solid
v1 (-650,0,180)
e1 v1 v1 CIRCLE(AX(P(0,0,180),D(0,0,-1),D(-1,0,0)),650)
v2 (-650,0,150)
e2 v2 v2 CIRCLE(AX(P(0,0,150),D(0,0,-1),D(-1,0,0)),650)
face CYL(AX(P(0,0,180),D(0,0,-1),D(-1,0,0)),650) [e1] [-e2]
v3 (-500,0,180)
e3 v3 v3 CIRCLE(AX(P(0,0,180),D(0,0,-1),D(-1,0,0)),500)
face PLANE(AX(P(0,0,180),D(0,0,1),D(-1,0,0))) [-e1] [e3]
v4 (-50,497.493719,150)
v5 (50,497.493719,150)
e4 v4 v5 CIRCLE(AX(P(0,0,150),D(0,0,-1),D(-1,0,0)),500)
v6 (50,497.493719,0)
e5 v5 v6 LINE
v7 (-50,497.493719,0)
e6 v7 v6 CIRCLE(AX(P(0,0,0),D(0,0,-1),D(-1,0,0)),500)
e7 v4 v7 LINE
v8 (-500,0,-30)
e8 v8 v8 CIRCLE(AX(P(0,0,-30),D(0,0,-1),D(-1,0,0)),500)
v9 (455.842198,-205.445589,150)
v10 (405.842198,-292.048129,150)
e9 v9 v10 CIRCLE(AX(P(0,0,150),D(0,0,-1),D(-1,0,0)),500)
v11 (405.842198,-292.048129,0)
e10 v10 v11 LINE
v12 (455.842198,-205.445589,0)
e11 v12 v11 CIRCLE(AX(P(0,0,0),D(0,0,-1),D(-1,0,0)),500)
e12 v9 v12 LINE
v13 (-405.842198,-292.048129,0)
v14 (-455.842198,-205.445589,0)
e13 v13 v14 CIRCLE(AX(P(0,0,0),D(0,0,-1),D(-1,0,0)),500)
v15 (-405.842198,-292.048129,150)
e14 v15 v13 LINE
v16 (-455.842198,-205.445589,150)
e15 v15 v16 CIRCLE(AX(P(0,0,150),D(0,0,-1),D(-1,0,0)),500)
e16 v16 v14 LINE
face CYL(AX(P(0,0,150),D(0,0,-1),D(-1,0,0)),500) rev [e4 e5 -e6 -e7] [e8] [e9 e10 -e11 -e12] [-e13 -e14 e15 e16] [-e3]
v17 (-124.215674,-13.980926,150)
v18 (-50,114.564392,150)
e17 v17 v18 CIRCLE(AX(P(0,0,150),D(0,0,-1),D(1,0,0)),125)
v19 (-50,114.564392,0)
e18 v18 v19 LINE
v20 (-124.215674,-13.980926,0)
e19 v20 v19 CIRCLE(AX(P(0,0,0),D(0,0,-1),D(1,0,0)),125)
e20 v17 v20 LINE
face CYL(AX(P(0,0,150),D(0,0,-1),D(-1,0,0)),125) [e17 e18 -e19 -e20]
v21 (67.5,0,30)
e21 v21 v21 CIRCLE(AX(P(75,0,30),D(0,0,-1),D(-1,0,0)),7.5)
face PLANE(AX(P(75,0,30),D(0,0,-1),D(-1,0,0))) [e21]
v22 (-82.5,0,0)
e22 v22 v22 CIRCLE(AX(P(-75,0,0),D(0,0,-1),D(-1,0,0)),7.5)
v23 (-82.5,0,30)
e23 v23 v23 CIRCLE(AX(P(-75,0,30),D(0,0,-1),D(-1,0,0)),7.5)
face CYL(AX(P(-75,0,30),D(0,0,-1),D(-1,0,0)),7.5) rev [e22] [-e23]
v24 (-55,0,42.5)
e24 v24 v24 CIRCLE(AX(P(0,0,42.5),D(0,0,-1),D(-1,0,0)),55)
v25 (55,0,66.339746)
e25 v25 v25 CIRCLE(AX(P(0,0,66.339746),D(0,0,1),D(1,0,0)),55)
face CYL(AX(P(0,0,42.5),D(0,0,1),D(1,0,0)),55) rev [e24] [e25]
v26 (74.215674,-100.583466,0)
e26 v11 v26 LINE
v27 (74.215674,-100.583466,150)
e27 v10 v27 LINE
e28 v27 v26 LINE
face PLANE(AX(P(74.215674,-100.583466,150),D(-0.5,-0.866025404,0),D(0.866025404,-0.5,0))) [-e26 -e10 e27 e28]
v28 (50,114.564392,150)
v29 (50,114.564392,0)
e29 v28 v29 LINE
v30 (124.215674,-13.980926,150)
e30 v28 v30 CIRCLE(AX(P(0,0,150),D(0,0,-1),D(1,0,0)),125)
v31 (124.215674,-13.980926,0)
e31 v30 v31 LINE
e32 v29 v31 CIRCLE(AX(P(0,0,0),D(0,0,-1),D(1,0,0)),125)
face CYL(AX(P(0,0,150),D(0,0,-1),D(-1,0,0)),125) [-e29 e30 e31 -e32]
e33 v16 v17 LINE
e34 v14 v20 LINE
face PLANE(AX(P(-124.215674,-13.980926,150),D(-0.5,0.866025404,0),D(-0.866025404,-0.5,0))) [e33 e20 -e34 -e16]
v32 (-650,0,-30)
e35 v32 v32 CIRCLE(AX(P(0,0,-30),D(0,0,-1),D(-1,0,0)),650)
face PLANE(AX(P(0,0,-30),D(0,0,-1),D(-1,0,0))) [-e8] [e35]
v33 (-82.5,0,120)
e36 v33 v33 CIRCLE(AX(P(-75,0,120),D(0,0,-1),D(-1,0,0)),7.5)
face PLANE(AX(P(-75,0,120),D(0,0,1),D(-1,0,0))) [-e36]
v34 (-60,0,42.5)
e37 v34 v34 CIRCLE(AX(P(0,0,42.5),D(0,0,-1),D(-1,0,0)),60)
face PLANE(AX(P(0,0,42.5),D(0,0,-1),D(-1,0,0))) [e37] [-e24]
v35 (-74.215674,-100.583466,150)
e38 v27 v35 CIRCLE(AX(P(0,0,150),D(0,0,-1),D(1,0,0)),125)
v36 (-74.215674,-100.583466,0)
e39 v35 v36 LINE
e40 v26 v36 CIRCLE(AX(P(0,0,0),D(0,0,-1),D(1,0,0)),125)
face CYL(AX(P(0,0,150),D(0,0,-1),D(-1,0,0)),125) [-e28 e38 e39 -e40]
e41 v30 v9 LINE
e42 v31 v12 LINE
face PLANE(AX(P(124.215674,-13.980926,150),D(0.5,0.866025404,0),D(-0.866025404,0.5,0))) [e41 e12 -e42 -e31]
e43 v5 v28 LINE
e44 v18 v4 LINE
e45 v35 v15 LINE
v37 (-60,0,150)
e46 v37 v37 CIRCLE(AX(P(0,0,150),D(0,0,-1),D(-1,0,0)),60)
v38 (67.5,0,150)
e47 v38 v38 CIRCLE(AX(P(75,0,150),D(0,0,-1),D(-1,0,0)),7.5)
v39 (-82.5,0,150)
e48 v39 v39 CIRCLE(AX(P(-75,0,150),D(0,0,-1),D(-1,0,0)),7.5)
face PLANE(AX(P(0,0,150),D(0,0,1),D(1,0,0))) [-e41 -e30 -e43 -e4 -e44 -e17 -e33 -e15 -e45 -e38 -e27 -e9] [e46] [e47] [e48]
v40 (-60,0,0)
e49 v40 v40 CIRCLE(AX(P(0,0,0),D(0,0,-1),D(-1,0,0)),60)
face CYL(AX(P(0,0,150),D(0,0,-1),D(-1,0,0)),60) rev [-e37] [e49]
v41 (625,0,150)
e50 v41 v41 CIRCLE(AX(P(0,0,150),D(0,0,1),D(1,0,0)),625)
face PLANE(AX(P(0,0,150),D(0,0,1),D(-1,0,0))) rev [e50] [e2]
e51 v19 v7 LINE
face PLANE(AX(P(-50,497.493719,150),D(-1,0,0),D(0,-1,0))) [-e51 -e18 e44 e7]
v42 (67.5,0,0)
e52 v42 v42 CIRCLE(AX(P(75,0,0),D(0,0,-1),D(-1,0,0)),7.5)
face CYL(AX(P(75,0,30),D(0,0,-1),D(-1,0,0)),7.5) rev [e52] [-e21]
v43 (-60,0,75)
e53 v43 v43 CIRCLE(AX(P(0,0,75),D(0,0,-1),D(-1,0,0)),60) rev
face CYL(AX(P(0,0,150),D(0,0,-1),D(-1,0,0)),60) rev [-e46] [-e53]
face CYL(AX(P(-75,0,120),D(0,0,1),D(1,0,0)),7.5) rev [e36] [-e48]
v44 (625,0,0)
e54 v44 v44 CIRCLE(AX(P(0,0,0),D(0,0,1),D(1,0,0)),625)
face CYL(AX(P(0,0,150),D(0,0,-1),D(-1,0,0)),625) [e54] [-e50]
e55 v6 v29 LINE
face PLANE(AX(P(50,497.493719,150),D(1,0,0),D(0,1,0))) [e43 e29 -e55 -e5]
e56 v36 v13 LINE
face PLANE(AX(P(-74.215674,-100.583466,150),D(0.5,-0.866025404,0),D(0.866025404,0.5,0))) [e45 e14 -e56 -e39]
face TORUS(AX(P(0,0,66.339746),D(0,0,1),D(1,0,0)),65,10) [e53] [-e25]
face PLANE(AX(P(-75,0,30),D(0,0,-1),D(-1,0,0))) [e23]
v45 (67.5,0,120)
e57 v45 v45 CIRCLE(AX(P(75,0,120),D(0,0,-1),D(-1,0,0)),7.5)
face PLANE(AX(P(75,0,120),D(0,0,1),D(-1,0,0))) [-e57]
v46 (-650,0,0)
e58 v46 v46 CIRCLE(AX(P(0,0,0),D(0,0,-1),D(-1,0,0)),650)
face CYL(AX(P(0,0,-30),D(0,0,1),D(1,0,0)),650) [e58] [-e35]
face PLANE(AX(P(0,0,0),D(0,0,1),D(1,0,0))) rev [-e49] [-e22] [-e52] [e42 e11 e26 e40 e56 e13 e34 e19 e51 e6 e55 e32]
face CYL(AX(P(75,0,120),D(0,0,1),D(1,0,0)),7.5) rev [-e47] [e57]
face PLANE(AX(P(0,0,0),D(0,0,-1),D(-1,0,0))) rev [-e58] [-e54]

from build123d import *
from build123d.topology import SkipClean

# Parameters (mm, degrees)
SKETCH3_R           = 625
BOSS_EXTRUDE1_DEPTH = 150
SKETCH4_R           = 60
CUT_EXTRUDE1_DEPTH  = 897.521054
BOSS_EXTRUDE2_START = 32.5
SKETCH5_R           = 60
SKETCH5_R_2         = 55
BOSS_EXTRUDE2_DEPTH = 32.5
FILLET3_R           = 10
SKETCH6_R           = 7.5
CUT_EXTRUDE2_DEPTH  = 30
BOSS_EXTRUDE3_START = 30
SKETCH7_R           = 650
SKETCH7_R_2         = 500
BOSS_EXTRUDE3_DEPTH = 30


with BuildPart() as part:
    # Sketch3 → Boss-Extrude1 (new body)
    with BuildSketch(Plane.XY):
        Circle(SKETCH3_R)
        with BuildLine():
            Line((-50, 497.493719), (-50, 114.564392))
            ThreePointArc((-50, 114.564392), (-108.253175, 62.5), (-124.215674, -13.980926))
            Line((-124.215674, -13.980926), (-455.842198, -205.445589))
            ThreePointArc((-455.842198, -205.445589), (-433.012702, 250), (-50, 497.493719))
        make_face(mode=Mode.SUBTRACT)
        with BuildLine():
            Line((50, 497.493719), (50, 114.564392))
            ThreePointArc((50, 114.564392), (108.253175, 62.5), (124.215674, -13.980926))
            Line((124.215674, -13.980926), (455.842198, -205.445589))
            ThreePointArc((455.842198, -205.445589), (433.012702, 250), (50, 497.493719))
        make_face(mode=Mode.SUBTRACT)
        with BuildLine():
            Line((-74.215674, -100.583466), (-405.842198, -292.048129))
            ThreePointArc((-405.842198, -292.048129), (0, -500), (405.842198, -292.048129))
            Line((405.842198, -292.048129), (74.215674, -100.583466))
            ThreePointArc((74.215674, -100.583466), (0, -125), (-74.215674, -100.583466))
        make_face(mode=Mode.SUBTRACT)
    extrude(amount=BOSS_EXTRUDE1_DEPTH)

    # Sketch4 → Cut-Extrude1 (cut, through all)
    with BuildSketch(Plane(origin=(0, 0, 0), x_dir=(-1, 0, 0), z_dir=(0, 0, -1))):
        Circle(SKETCH4_R)
    extrude(amount=-CUT_EXTRUDE1_DEPTH, mode=Mode.SUBTRACT)

    # Sketch5 → Boss-Extrude2 (add)
    with BuildSketch(Plane(origin=(0, 0, 75), x_dir=(-1, 0, 0), z_dir=(0, 0, -1)).offset(BOSS_EXTRUDE2_START)):
        Circle(SKETCH5_R)
        Circle(SKETCH5_R_2, mode=Mode.SUBTRACT)
    extrude(amount=-BOSS_EXTRUDE2_DEPTH)

    # Fillet3
    # the kernel refuses this fillet: 10 mm, written as the material it takes off along each edge
    with BuildSketch(Plane(origin=(0, 0, 75), x_dir=(-1, 0, 0), z_dir=(0, -1, 0))) as fillet3_piece_1:
        with BuildLine():
            CenterArc((65, 8.660254), FILLET3_R, 180, 60)
            Line((55, 8.660254), (54.8, 8.660254))
            Line((54.8, 8.660254), (54.8, 0))
            Line((54.8, 0), (55, -0.2))
            ThreePointArc((55, -0.2), (57.5, -0.2), (59.9, -0.173205))
            Line((59.9, -0.173205), (60, 0))
        make_face()
    revolve(axis=Axis((0, 0, 75), (0, 0, -1)), mode=Mode.SUBTRACT)

    # Sketch6 → Cut-Extrude2 (cut)
    with BuildSketch(Plane(origin=(0, 0, 0), x_dir=(-1, 0, 0), z_dir=(0, 0, -1))):
        with Locations((-75, 0)):
            Circle(SKETCH6_R)
        with Locations((75, 0)):
            Circle(SKETCH6_R)
    cut_extrude2 = extrude(amount=-CUT_EXTRUDE2_DEPTH, mode=Mode.SUBTRACT)

    # Mirror1: Cut-Extrude2 across plane
    add(cut_extrude2.mirror(Plane(origin=(0, 0, 75), x_dir=(1, 0, 0), z_dir=(0, 0, -1))), mode=Mode.SUBTRACT)

    # Sketch7 → Boss-Extrude3 (add)
    with BuildSketch(Plane(origin=(0, 0, 0), x_dir=(-1, 0, 0), z_dir=(0, 0, -1)).offset(BOSS_EXTRUDE3_START)):
        Circle(SKETCH7_R)
        Circle(SKETCH7_R_2, mode=Mode.SUBTRACT)
    boss_extrude3 = extrude(amount=-BOSS_EXTRUDE3_DEPTH)

    # Mirror2: Boss-Extrude3 across plane
    with SkipClean():  # the faces are left unmerged after this step: merging them gives an invalid solid
        add(boss_extrude3.mirror(Plane(origin=(0, 0, 75), x_dir=(1, 0, 0), z_dir=(0, 0, -1))))


solid = part.part
